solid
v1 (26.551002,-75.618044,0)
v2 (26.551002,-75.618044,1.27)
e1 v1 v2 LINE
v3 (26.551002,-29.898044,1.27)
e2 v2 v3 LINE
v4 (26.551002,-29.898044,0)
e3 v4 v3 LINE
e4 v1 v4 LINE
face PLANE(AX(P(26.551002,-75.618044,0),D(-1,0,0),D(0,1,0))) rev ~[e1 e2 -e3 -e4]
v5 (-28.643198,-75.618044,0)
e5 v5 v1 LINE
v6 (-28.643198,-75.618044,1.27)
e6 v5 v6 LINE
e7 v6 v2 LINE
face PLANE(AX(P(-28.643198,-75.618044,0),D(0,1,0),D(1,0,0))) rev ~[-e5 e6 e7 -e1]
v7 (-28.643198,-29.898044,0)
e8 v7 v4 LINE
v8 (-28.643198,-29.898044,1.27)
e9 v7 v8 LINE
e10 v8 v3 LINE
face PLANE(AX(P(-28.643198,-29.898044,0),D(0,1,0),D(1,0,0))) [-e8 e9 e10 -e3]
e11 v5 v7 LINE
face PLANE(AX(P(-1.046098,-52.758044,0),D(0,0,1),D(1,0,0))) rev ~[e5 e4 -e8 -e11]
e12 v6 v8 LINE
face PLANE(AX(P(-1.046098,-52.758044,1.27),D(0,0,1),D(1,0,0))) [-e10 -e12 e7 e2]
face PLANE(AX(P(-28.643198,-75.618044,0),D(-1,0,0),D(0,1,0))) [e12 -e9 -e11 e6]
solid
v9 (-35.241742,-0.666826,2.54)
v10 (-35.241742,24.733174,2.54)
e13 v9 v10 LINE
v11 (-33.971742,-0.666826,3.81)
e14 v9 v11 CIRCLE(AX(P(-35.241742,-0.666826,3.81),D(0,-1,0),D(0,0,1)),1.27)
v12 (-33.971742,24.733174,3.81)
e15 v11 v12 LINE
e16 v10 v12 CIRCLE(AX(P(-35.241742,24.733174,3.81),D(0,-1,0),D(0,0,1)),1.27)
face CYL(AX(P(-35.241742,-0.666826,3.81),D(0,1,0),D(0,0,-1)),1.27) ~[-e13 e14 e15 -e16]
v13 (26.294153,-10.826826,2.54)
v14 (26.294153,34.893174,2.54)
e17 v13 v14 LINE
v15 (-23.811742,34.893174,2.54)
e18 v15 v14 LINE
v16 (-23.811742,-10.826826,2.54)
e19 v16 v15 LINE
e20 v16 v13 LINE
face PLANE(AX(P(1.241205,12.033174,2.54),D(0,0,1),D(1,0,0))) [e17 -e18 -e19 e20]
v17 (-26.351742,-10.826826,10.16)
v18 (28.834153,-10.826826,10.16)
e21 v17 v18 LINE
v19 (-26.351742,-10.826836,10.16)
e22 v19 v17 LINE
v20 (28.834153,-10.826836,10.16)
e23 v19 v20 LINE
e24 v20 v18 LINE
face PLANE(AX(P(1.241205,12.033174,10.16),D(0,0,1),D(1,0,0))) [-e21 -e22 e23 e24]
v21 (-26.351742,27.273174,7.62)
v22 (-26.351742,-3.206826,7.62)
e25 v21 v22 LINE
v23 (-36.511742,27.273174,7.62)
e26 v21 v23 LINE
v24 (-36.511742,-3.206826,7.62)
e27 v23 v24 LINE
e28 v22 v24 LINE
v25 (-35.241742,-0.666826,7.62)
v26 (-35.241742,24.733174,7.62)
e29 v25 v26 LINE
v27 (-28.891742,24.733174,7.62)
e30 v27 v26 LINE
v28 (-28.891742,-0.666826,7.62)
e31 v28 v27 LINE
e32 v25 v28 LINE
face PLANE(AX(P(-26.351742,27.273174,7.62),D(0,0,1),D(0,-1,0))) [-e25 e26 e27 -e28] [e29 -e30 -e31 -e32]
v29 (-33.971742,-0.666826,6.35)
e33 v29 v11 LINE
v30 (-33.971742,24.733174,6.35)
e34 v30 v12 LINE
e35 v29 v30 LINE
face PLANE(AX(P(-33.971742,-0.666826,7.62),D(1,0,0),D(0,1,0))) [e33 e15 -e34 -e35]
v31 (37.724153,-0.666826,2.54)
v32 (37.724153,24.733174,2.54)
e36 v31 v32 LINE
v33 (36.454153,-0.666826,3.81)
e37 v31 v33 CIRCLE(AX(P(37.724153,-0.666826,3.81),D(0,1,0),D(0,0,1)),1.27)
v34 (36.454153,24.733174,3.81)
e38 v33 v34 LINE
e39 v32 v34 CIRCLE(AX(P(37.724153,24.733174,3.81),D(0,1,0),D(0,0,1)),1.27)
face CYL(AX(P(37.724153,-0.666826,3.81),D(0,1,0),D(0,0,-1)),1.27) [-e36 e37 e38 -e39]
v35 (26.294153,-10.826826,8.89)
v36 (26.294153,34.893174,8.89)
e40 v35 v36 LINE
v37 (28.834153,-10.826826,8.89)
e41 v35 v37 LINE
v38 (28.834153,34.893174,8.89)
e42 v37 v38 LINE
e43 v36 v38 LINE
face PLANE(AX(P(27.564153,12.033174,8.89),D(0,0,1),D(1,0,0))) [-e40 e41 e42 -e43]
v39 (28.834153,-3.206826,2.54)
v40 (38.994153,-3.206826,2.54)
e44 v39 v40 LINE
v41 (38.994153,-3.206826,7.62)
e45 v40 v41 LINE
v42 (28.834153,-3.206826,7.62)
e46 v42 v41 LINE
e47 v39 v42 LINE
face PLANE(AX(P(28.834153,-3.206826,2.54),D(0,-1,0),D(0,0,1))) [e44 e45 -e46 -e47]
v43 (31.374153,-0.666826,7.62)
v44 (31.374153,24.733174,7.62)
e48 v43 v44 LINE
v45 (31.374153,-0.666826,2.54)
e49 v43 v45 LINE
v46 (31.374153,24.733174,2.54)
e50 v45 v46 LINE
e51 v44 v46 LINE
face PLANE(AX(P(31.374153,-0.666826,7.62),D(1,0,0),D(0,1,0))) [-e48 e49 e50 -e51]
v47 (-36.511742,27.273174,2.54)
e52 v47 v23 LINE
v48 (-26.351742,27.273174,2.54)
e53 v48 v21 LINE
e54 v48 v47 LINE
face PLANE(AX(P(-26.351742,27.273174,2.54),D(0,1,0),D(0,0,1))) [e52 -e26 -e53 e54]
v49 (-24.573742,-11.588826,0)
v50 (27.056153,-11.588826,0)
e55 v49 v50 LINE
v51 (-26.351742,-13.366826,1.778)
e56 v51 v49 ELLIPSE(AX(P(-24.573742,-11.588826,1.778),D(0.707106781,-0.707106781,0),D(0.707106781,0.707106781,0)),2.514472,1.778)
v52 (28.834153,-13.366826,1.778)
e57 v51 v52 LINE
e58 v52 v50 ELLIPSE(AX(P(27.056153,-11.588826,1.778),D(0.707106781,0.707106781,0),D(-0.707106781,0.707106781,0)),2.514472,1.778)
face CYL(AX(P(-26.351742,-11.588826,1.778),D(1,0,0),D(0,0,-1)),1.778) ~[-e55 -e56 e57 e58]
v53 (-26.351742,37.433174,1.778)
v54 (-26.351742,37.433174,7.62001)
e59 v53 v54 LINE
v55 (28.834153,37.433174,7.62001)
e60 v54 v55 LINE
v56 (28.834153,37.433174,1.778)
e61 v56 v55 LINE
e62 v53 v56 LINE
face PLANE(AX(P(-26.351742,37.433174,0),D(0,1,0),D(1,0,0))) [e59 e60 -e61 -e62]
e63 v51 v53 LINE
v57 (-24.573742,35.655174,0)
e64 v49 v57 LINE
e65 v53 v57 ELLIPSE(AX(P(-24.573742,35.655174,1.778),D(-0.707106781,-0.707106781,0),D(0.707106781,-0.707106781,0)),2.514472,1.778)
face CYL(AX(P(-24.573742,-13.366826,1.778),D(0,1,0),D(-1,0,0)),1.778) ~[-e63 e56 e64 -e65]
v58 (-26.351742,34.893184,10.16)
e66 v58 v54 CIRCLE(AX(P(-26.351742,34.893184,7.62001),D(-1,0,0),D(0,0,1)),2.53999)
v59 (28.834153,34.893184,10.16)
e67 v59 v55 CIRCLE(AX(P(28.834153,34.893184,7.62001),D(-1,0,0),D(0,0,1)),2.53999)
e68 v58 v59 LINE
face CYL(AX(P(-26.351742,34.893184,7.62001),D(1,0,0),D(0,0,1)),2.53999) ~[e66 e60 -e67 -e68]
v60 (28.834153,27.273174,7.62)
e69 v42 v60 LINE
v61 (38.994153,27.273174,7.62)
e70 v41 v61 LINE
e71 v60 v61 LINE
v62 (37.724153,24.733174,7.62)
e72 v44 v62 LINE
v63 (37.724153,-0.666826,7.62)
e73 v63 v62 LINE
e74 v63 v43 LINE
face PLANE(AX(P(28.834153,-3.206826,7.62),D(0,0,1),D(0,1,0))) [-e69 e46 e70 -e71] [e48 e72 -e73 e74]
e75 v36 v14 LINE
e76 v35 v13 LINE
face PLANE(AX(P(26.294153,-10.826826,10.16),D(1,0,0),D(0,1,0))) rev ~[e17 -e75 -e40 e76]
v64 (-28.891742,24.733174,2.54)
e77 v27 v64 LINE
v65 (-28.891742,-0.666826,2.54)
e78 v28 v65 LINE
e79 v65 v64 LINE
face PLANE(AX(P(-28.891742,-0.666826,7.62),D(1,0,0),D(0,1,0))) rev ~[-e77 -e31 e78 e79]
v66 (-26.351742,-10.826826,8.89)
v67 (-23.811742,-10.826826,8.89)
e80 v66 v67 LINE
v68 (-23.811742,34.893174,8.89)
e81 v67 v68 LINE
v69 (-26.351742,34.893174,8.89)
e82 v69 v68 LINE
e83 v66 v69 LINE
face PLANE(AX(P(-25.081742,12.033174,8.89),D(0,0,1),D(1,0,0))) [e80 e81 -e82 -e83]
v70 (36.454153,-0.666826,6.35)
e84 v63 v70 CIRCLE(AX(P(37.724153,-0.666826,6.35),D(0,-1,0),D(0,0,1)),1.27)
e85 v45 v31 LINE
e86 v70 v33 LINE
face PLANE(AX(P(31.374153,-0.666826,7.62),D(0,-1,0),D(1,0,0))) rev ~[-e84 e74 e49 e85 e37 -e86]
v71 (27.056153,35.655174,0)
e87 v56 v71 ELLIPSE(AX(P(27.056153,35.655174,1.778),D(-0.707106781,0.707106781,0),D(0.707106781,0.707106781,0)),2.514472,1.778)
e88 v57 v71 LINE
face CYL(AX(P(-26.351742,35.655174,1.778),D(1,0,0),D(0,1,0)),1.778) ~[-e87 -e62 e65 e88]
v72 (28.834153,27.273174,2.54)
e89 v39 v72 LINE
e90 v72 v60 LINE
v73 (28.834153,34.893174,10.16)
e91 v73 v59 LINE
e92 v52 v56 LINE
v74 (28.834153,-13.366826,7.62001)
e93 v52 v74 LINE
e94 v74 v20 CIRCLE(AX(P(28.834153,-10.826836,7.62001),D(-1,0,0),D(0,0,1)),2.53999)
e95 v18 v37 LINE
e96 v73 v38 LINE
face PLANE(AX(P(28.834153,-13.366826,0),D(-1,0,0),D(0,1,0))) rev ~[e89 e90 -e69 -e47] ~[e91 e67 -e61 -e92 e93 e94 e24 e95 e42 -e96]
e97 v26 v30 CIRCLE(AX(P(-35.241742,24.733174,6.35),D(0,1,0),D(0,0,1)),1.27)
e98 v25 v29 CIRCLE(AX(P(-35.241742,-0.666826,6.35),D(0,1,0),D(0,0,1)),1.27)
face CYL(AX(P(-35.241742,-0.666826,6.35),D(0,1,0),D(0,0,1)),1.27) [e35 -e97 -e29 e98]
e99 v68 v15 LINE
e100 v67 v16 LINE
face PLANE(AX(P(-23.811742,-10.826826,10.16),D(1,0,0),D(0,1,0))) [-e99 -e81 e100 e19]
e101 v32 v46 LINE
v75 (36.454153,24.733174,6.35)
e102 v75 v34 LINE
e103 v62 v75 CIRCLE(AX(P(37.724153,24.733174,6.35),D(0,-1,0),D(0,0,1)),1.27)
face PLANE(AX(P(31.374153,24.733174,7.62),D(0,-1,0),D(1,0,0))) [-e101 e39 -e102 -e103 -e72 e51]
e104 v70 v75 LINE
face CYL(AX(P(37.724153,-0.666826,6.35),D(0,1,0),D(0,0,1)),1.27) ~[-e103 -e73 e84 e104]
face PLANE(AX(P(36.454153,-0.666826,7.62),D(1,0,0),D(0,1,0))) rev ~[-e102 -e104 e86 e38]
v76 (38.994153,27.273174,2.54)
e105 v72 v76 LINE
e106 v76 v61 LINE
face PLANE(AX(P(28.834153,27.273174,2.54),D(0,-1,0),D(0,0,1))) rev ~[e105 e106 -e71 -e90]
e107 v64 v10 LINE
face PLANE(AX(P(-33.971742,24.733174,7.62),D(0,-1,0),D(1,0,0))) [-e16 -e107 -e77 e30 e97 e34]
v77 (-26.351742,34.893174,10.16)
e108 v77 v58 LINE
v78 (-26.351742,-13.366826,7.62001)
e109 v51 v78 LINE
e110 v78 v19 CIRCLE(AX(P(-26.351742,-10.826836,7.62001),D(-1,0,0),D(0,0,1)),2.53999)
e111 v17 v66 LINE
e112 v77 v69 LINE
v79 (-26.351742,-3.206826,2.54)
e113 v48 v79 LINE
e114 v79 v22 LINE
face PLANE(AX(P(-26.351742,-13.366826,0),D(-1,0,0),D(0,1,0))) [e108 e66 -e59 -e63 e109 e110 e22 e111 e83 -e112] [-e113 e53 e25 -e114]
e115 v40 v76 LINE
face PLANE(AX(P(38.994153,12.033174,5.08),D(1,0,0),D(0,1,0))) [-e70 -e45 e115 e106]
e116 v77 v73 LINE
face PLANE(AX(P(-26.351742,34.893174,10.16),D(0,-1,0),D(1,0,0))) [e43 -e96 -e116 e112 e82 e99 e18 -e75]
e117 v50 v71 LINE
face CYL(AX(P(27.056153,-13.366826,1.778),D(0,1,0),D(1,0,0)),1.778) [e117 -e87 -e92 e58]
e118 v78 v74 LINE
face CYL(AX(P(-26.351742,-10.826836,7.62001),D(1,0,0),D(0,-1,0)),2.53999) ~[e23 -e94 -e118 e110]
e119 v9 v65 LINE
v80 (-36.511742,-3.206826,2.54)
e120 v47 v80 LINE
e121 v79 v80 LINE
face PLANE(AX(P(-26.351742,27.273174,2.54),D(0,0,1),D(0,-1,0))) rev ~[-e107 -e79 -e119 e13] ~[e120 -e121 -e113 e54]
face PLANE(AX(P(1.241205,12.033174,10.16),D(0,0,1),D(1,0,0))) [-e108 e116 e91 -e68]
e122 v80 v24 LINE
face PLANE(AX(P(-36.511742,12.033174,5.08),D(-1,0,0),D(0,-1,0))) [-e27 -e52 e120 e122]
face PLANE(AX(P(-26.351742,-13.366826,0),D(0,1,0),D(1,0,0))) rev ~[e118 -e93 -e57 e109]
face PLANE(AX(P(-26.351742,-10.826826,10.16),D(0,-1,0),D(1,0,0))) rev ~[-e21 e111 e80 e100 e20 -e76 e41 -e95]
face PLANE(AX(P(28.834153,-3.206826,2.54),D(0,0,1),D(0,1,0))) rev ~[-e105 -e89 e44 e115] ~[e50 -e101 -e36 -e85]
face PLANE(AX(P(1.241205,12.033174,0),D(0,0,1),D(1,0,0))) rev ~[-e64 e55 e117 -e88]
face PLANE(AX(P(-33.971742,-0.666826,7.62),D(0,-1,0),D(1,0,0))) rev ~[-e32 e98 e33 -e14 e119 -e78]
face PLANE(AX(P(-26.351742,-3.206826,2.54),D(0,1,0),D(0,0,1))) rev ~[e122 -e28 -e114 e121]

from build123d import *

# Parameters (mm, degrees)
F0_W      = 55.1858954132
F0_H      = 50.8
F1_DEPTH  = 10.16
F2_W      = 30.48
F2_H      = 5.08
F3_DEPTH  = 10.16
F4_W      = 30.48
F4_H      = 5.08
F5_DEPTH  = 10.16
F6_W      = 50.1058954132
F6_H      = 45.72
F7_DEPTH  = 7.62
F8_R      = 2.53999
F9_W      = 2.54
F9_H      = 45.72
F10_DEPTH = 1.27
F11_W     = 55.1942
F11_H     = 45.72
F12_DEPTH = 1.27
F13_W     = 5.08
F13_H     = 25.4
F14_DEPTH = 25.4
F15_R     = 1.27
F16_R     = 1.778


# Not quite as in the source:
# - a fillet or chamfer is up to 0.001 mm smaller than in the source, because OpenCascade refuses the exact size


with BuildPart() as f1:
    # F0 (on Top) → F1 (new body)
    with BuildSketch(Plane.XY):
        with Locations((1.2412052602, 12.0331741214)):
            Rectangle(F0_W, F0_H)
    extrude(amount=F1_DEPTH)

    # F2 (on face) → F3 (join)
    with BuildSketch(Plane.YZ.offset(28.8341529667)):
        with Locations((12.0331741214, 5.08)):
            Rectangle(F2_W, F2_H)
    extrude(amount=F3_DEPTH)

    # F4 (on face) → F5 (join)
    with BuildSketch(Plane(origin=(-26.3517424464, 0, 0), x_dir=(0, -1, 0), z_dir=(-1, 0, 0))):
        with Locations((-12.0331741214, 5.08)):
            Rectangle(F4_W, F4_H)
    extrude(amount=F5_DEPTH)

    # F6 (on face) → F7 (cut)
    with BuildSketch(Plane.XY.offset(10.16)):
        with Locations((1.2412052602, 12.0331741214)):
            Rectangle(F6_W, F6_H)
    extrude(amount=-F7_DEPTH, mode=Mode.SUBTRACT)

    # F8 (radius 2.54 in the source; OpenCascade refuses exactly that, so slightly less here)
    f8_edges = [f1.edges().sort_by_distance(p)[0] for p in [
        (1.241205, -13.366826, 10.16),
        (1.241205, 37.433174, 10.16),
    ]]
    fillet(f8_edges, radius=F8_R)

    # F9 (on face) → F10 (cut)
    with BuildSketch(Plane.XY.offset(10.16)):
        with Locations((27.5641529667, 12.0331741214)):
            Rectangle(F9_W, F9_H)
        with Locations((-25.0817424464, 12.0331741214)):
            Rectangle(F9_W, F9_H)
    extrude(amount=-F10_DEPTH, mode=Mode.SUBTRACT)

    # F13 (on face) → F14 (cut)
    with BuildSketch(Plane.XY.offset(7.62)):
        with Locations((-31.4317424464, 12.0331741214)):
            Rectangle(F13_W, F13_H)
        with Locations((33.9141529667, 12.0331741214)):
            Rectangle(F13_W, F13_H)
    extrude(amount=-F14_DEPTH, mode=Mode.SUBTRACT)

    # F15
    f15_edges = [f1.edges().sort_by_distance(p)[0] for p in [
        (-33.971742, 12.033174, 7.62),
        (-33.971742, 12.033174, 2.54),
        (36.454153, 12.033174, 2.54),
        (36.454153, 12.033174, 7.62),
    ]]
    fillet(f15_edges, radius=F15_R)

    # F16
    f16_edges = [f1.edges().sort_by_distance(p)[0] for p in [
        (28.834153, 12.033174, 0),
        (1.241205, 37.433174, 0),
        (-26.351742, 12.033174, 0),
        (1.241205, -13.366826, 0),
    ]]
    fillet(f16_edges, radius=F16_R)


with BuildPart() as f12:
    # F11 (on Top) → F12 (new body)
    with BuildSketch(Plane.XY):
        with Locations((-1.0460983113, -52.7580435419)):
            Rectangle(F11_W, F11_H)
    extrude(amount=F12_DEPTH)


solid = Compound([f1.part, f12.part])
